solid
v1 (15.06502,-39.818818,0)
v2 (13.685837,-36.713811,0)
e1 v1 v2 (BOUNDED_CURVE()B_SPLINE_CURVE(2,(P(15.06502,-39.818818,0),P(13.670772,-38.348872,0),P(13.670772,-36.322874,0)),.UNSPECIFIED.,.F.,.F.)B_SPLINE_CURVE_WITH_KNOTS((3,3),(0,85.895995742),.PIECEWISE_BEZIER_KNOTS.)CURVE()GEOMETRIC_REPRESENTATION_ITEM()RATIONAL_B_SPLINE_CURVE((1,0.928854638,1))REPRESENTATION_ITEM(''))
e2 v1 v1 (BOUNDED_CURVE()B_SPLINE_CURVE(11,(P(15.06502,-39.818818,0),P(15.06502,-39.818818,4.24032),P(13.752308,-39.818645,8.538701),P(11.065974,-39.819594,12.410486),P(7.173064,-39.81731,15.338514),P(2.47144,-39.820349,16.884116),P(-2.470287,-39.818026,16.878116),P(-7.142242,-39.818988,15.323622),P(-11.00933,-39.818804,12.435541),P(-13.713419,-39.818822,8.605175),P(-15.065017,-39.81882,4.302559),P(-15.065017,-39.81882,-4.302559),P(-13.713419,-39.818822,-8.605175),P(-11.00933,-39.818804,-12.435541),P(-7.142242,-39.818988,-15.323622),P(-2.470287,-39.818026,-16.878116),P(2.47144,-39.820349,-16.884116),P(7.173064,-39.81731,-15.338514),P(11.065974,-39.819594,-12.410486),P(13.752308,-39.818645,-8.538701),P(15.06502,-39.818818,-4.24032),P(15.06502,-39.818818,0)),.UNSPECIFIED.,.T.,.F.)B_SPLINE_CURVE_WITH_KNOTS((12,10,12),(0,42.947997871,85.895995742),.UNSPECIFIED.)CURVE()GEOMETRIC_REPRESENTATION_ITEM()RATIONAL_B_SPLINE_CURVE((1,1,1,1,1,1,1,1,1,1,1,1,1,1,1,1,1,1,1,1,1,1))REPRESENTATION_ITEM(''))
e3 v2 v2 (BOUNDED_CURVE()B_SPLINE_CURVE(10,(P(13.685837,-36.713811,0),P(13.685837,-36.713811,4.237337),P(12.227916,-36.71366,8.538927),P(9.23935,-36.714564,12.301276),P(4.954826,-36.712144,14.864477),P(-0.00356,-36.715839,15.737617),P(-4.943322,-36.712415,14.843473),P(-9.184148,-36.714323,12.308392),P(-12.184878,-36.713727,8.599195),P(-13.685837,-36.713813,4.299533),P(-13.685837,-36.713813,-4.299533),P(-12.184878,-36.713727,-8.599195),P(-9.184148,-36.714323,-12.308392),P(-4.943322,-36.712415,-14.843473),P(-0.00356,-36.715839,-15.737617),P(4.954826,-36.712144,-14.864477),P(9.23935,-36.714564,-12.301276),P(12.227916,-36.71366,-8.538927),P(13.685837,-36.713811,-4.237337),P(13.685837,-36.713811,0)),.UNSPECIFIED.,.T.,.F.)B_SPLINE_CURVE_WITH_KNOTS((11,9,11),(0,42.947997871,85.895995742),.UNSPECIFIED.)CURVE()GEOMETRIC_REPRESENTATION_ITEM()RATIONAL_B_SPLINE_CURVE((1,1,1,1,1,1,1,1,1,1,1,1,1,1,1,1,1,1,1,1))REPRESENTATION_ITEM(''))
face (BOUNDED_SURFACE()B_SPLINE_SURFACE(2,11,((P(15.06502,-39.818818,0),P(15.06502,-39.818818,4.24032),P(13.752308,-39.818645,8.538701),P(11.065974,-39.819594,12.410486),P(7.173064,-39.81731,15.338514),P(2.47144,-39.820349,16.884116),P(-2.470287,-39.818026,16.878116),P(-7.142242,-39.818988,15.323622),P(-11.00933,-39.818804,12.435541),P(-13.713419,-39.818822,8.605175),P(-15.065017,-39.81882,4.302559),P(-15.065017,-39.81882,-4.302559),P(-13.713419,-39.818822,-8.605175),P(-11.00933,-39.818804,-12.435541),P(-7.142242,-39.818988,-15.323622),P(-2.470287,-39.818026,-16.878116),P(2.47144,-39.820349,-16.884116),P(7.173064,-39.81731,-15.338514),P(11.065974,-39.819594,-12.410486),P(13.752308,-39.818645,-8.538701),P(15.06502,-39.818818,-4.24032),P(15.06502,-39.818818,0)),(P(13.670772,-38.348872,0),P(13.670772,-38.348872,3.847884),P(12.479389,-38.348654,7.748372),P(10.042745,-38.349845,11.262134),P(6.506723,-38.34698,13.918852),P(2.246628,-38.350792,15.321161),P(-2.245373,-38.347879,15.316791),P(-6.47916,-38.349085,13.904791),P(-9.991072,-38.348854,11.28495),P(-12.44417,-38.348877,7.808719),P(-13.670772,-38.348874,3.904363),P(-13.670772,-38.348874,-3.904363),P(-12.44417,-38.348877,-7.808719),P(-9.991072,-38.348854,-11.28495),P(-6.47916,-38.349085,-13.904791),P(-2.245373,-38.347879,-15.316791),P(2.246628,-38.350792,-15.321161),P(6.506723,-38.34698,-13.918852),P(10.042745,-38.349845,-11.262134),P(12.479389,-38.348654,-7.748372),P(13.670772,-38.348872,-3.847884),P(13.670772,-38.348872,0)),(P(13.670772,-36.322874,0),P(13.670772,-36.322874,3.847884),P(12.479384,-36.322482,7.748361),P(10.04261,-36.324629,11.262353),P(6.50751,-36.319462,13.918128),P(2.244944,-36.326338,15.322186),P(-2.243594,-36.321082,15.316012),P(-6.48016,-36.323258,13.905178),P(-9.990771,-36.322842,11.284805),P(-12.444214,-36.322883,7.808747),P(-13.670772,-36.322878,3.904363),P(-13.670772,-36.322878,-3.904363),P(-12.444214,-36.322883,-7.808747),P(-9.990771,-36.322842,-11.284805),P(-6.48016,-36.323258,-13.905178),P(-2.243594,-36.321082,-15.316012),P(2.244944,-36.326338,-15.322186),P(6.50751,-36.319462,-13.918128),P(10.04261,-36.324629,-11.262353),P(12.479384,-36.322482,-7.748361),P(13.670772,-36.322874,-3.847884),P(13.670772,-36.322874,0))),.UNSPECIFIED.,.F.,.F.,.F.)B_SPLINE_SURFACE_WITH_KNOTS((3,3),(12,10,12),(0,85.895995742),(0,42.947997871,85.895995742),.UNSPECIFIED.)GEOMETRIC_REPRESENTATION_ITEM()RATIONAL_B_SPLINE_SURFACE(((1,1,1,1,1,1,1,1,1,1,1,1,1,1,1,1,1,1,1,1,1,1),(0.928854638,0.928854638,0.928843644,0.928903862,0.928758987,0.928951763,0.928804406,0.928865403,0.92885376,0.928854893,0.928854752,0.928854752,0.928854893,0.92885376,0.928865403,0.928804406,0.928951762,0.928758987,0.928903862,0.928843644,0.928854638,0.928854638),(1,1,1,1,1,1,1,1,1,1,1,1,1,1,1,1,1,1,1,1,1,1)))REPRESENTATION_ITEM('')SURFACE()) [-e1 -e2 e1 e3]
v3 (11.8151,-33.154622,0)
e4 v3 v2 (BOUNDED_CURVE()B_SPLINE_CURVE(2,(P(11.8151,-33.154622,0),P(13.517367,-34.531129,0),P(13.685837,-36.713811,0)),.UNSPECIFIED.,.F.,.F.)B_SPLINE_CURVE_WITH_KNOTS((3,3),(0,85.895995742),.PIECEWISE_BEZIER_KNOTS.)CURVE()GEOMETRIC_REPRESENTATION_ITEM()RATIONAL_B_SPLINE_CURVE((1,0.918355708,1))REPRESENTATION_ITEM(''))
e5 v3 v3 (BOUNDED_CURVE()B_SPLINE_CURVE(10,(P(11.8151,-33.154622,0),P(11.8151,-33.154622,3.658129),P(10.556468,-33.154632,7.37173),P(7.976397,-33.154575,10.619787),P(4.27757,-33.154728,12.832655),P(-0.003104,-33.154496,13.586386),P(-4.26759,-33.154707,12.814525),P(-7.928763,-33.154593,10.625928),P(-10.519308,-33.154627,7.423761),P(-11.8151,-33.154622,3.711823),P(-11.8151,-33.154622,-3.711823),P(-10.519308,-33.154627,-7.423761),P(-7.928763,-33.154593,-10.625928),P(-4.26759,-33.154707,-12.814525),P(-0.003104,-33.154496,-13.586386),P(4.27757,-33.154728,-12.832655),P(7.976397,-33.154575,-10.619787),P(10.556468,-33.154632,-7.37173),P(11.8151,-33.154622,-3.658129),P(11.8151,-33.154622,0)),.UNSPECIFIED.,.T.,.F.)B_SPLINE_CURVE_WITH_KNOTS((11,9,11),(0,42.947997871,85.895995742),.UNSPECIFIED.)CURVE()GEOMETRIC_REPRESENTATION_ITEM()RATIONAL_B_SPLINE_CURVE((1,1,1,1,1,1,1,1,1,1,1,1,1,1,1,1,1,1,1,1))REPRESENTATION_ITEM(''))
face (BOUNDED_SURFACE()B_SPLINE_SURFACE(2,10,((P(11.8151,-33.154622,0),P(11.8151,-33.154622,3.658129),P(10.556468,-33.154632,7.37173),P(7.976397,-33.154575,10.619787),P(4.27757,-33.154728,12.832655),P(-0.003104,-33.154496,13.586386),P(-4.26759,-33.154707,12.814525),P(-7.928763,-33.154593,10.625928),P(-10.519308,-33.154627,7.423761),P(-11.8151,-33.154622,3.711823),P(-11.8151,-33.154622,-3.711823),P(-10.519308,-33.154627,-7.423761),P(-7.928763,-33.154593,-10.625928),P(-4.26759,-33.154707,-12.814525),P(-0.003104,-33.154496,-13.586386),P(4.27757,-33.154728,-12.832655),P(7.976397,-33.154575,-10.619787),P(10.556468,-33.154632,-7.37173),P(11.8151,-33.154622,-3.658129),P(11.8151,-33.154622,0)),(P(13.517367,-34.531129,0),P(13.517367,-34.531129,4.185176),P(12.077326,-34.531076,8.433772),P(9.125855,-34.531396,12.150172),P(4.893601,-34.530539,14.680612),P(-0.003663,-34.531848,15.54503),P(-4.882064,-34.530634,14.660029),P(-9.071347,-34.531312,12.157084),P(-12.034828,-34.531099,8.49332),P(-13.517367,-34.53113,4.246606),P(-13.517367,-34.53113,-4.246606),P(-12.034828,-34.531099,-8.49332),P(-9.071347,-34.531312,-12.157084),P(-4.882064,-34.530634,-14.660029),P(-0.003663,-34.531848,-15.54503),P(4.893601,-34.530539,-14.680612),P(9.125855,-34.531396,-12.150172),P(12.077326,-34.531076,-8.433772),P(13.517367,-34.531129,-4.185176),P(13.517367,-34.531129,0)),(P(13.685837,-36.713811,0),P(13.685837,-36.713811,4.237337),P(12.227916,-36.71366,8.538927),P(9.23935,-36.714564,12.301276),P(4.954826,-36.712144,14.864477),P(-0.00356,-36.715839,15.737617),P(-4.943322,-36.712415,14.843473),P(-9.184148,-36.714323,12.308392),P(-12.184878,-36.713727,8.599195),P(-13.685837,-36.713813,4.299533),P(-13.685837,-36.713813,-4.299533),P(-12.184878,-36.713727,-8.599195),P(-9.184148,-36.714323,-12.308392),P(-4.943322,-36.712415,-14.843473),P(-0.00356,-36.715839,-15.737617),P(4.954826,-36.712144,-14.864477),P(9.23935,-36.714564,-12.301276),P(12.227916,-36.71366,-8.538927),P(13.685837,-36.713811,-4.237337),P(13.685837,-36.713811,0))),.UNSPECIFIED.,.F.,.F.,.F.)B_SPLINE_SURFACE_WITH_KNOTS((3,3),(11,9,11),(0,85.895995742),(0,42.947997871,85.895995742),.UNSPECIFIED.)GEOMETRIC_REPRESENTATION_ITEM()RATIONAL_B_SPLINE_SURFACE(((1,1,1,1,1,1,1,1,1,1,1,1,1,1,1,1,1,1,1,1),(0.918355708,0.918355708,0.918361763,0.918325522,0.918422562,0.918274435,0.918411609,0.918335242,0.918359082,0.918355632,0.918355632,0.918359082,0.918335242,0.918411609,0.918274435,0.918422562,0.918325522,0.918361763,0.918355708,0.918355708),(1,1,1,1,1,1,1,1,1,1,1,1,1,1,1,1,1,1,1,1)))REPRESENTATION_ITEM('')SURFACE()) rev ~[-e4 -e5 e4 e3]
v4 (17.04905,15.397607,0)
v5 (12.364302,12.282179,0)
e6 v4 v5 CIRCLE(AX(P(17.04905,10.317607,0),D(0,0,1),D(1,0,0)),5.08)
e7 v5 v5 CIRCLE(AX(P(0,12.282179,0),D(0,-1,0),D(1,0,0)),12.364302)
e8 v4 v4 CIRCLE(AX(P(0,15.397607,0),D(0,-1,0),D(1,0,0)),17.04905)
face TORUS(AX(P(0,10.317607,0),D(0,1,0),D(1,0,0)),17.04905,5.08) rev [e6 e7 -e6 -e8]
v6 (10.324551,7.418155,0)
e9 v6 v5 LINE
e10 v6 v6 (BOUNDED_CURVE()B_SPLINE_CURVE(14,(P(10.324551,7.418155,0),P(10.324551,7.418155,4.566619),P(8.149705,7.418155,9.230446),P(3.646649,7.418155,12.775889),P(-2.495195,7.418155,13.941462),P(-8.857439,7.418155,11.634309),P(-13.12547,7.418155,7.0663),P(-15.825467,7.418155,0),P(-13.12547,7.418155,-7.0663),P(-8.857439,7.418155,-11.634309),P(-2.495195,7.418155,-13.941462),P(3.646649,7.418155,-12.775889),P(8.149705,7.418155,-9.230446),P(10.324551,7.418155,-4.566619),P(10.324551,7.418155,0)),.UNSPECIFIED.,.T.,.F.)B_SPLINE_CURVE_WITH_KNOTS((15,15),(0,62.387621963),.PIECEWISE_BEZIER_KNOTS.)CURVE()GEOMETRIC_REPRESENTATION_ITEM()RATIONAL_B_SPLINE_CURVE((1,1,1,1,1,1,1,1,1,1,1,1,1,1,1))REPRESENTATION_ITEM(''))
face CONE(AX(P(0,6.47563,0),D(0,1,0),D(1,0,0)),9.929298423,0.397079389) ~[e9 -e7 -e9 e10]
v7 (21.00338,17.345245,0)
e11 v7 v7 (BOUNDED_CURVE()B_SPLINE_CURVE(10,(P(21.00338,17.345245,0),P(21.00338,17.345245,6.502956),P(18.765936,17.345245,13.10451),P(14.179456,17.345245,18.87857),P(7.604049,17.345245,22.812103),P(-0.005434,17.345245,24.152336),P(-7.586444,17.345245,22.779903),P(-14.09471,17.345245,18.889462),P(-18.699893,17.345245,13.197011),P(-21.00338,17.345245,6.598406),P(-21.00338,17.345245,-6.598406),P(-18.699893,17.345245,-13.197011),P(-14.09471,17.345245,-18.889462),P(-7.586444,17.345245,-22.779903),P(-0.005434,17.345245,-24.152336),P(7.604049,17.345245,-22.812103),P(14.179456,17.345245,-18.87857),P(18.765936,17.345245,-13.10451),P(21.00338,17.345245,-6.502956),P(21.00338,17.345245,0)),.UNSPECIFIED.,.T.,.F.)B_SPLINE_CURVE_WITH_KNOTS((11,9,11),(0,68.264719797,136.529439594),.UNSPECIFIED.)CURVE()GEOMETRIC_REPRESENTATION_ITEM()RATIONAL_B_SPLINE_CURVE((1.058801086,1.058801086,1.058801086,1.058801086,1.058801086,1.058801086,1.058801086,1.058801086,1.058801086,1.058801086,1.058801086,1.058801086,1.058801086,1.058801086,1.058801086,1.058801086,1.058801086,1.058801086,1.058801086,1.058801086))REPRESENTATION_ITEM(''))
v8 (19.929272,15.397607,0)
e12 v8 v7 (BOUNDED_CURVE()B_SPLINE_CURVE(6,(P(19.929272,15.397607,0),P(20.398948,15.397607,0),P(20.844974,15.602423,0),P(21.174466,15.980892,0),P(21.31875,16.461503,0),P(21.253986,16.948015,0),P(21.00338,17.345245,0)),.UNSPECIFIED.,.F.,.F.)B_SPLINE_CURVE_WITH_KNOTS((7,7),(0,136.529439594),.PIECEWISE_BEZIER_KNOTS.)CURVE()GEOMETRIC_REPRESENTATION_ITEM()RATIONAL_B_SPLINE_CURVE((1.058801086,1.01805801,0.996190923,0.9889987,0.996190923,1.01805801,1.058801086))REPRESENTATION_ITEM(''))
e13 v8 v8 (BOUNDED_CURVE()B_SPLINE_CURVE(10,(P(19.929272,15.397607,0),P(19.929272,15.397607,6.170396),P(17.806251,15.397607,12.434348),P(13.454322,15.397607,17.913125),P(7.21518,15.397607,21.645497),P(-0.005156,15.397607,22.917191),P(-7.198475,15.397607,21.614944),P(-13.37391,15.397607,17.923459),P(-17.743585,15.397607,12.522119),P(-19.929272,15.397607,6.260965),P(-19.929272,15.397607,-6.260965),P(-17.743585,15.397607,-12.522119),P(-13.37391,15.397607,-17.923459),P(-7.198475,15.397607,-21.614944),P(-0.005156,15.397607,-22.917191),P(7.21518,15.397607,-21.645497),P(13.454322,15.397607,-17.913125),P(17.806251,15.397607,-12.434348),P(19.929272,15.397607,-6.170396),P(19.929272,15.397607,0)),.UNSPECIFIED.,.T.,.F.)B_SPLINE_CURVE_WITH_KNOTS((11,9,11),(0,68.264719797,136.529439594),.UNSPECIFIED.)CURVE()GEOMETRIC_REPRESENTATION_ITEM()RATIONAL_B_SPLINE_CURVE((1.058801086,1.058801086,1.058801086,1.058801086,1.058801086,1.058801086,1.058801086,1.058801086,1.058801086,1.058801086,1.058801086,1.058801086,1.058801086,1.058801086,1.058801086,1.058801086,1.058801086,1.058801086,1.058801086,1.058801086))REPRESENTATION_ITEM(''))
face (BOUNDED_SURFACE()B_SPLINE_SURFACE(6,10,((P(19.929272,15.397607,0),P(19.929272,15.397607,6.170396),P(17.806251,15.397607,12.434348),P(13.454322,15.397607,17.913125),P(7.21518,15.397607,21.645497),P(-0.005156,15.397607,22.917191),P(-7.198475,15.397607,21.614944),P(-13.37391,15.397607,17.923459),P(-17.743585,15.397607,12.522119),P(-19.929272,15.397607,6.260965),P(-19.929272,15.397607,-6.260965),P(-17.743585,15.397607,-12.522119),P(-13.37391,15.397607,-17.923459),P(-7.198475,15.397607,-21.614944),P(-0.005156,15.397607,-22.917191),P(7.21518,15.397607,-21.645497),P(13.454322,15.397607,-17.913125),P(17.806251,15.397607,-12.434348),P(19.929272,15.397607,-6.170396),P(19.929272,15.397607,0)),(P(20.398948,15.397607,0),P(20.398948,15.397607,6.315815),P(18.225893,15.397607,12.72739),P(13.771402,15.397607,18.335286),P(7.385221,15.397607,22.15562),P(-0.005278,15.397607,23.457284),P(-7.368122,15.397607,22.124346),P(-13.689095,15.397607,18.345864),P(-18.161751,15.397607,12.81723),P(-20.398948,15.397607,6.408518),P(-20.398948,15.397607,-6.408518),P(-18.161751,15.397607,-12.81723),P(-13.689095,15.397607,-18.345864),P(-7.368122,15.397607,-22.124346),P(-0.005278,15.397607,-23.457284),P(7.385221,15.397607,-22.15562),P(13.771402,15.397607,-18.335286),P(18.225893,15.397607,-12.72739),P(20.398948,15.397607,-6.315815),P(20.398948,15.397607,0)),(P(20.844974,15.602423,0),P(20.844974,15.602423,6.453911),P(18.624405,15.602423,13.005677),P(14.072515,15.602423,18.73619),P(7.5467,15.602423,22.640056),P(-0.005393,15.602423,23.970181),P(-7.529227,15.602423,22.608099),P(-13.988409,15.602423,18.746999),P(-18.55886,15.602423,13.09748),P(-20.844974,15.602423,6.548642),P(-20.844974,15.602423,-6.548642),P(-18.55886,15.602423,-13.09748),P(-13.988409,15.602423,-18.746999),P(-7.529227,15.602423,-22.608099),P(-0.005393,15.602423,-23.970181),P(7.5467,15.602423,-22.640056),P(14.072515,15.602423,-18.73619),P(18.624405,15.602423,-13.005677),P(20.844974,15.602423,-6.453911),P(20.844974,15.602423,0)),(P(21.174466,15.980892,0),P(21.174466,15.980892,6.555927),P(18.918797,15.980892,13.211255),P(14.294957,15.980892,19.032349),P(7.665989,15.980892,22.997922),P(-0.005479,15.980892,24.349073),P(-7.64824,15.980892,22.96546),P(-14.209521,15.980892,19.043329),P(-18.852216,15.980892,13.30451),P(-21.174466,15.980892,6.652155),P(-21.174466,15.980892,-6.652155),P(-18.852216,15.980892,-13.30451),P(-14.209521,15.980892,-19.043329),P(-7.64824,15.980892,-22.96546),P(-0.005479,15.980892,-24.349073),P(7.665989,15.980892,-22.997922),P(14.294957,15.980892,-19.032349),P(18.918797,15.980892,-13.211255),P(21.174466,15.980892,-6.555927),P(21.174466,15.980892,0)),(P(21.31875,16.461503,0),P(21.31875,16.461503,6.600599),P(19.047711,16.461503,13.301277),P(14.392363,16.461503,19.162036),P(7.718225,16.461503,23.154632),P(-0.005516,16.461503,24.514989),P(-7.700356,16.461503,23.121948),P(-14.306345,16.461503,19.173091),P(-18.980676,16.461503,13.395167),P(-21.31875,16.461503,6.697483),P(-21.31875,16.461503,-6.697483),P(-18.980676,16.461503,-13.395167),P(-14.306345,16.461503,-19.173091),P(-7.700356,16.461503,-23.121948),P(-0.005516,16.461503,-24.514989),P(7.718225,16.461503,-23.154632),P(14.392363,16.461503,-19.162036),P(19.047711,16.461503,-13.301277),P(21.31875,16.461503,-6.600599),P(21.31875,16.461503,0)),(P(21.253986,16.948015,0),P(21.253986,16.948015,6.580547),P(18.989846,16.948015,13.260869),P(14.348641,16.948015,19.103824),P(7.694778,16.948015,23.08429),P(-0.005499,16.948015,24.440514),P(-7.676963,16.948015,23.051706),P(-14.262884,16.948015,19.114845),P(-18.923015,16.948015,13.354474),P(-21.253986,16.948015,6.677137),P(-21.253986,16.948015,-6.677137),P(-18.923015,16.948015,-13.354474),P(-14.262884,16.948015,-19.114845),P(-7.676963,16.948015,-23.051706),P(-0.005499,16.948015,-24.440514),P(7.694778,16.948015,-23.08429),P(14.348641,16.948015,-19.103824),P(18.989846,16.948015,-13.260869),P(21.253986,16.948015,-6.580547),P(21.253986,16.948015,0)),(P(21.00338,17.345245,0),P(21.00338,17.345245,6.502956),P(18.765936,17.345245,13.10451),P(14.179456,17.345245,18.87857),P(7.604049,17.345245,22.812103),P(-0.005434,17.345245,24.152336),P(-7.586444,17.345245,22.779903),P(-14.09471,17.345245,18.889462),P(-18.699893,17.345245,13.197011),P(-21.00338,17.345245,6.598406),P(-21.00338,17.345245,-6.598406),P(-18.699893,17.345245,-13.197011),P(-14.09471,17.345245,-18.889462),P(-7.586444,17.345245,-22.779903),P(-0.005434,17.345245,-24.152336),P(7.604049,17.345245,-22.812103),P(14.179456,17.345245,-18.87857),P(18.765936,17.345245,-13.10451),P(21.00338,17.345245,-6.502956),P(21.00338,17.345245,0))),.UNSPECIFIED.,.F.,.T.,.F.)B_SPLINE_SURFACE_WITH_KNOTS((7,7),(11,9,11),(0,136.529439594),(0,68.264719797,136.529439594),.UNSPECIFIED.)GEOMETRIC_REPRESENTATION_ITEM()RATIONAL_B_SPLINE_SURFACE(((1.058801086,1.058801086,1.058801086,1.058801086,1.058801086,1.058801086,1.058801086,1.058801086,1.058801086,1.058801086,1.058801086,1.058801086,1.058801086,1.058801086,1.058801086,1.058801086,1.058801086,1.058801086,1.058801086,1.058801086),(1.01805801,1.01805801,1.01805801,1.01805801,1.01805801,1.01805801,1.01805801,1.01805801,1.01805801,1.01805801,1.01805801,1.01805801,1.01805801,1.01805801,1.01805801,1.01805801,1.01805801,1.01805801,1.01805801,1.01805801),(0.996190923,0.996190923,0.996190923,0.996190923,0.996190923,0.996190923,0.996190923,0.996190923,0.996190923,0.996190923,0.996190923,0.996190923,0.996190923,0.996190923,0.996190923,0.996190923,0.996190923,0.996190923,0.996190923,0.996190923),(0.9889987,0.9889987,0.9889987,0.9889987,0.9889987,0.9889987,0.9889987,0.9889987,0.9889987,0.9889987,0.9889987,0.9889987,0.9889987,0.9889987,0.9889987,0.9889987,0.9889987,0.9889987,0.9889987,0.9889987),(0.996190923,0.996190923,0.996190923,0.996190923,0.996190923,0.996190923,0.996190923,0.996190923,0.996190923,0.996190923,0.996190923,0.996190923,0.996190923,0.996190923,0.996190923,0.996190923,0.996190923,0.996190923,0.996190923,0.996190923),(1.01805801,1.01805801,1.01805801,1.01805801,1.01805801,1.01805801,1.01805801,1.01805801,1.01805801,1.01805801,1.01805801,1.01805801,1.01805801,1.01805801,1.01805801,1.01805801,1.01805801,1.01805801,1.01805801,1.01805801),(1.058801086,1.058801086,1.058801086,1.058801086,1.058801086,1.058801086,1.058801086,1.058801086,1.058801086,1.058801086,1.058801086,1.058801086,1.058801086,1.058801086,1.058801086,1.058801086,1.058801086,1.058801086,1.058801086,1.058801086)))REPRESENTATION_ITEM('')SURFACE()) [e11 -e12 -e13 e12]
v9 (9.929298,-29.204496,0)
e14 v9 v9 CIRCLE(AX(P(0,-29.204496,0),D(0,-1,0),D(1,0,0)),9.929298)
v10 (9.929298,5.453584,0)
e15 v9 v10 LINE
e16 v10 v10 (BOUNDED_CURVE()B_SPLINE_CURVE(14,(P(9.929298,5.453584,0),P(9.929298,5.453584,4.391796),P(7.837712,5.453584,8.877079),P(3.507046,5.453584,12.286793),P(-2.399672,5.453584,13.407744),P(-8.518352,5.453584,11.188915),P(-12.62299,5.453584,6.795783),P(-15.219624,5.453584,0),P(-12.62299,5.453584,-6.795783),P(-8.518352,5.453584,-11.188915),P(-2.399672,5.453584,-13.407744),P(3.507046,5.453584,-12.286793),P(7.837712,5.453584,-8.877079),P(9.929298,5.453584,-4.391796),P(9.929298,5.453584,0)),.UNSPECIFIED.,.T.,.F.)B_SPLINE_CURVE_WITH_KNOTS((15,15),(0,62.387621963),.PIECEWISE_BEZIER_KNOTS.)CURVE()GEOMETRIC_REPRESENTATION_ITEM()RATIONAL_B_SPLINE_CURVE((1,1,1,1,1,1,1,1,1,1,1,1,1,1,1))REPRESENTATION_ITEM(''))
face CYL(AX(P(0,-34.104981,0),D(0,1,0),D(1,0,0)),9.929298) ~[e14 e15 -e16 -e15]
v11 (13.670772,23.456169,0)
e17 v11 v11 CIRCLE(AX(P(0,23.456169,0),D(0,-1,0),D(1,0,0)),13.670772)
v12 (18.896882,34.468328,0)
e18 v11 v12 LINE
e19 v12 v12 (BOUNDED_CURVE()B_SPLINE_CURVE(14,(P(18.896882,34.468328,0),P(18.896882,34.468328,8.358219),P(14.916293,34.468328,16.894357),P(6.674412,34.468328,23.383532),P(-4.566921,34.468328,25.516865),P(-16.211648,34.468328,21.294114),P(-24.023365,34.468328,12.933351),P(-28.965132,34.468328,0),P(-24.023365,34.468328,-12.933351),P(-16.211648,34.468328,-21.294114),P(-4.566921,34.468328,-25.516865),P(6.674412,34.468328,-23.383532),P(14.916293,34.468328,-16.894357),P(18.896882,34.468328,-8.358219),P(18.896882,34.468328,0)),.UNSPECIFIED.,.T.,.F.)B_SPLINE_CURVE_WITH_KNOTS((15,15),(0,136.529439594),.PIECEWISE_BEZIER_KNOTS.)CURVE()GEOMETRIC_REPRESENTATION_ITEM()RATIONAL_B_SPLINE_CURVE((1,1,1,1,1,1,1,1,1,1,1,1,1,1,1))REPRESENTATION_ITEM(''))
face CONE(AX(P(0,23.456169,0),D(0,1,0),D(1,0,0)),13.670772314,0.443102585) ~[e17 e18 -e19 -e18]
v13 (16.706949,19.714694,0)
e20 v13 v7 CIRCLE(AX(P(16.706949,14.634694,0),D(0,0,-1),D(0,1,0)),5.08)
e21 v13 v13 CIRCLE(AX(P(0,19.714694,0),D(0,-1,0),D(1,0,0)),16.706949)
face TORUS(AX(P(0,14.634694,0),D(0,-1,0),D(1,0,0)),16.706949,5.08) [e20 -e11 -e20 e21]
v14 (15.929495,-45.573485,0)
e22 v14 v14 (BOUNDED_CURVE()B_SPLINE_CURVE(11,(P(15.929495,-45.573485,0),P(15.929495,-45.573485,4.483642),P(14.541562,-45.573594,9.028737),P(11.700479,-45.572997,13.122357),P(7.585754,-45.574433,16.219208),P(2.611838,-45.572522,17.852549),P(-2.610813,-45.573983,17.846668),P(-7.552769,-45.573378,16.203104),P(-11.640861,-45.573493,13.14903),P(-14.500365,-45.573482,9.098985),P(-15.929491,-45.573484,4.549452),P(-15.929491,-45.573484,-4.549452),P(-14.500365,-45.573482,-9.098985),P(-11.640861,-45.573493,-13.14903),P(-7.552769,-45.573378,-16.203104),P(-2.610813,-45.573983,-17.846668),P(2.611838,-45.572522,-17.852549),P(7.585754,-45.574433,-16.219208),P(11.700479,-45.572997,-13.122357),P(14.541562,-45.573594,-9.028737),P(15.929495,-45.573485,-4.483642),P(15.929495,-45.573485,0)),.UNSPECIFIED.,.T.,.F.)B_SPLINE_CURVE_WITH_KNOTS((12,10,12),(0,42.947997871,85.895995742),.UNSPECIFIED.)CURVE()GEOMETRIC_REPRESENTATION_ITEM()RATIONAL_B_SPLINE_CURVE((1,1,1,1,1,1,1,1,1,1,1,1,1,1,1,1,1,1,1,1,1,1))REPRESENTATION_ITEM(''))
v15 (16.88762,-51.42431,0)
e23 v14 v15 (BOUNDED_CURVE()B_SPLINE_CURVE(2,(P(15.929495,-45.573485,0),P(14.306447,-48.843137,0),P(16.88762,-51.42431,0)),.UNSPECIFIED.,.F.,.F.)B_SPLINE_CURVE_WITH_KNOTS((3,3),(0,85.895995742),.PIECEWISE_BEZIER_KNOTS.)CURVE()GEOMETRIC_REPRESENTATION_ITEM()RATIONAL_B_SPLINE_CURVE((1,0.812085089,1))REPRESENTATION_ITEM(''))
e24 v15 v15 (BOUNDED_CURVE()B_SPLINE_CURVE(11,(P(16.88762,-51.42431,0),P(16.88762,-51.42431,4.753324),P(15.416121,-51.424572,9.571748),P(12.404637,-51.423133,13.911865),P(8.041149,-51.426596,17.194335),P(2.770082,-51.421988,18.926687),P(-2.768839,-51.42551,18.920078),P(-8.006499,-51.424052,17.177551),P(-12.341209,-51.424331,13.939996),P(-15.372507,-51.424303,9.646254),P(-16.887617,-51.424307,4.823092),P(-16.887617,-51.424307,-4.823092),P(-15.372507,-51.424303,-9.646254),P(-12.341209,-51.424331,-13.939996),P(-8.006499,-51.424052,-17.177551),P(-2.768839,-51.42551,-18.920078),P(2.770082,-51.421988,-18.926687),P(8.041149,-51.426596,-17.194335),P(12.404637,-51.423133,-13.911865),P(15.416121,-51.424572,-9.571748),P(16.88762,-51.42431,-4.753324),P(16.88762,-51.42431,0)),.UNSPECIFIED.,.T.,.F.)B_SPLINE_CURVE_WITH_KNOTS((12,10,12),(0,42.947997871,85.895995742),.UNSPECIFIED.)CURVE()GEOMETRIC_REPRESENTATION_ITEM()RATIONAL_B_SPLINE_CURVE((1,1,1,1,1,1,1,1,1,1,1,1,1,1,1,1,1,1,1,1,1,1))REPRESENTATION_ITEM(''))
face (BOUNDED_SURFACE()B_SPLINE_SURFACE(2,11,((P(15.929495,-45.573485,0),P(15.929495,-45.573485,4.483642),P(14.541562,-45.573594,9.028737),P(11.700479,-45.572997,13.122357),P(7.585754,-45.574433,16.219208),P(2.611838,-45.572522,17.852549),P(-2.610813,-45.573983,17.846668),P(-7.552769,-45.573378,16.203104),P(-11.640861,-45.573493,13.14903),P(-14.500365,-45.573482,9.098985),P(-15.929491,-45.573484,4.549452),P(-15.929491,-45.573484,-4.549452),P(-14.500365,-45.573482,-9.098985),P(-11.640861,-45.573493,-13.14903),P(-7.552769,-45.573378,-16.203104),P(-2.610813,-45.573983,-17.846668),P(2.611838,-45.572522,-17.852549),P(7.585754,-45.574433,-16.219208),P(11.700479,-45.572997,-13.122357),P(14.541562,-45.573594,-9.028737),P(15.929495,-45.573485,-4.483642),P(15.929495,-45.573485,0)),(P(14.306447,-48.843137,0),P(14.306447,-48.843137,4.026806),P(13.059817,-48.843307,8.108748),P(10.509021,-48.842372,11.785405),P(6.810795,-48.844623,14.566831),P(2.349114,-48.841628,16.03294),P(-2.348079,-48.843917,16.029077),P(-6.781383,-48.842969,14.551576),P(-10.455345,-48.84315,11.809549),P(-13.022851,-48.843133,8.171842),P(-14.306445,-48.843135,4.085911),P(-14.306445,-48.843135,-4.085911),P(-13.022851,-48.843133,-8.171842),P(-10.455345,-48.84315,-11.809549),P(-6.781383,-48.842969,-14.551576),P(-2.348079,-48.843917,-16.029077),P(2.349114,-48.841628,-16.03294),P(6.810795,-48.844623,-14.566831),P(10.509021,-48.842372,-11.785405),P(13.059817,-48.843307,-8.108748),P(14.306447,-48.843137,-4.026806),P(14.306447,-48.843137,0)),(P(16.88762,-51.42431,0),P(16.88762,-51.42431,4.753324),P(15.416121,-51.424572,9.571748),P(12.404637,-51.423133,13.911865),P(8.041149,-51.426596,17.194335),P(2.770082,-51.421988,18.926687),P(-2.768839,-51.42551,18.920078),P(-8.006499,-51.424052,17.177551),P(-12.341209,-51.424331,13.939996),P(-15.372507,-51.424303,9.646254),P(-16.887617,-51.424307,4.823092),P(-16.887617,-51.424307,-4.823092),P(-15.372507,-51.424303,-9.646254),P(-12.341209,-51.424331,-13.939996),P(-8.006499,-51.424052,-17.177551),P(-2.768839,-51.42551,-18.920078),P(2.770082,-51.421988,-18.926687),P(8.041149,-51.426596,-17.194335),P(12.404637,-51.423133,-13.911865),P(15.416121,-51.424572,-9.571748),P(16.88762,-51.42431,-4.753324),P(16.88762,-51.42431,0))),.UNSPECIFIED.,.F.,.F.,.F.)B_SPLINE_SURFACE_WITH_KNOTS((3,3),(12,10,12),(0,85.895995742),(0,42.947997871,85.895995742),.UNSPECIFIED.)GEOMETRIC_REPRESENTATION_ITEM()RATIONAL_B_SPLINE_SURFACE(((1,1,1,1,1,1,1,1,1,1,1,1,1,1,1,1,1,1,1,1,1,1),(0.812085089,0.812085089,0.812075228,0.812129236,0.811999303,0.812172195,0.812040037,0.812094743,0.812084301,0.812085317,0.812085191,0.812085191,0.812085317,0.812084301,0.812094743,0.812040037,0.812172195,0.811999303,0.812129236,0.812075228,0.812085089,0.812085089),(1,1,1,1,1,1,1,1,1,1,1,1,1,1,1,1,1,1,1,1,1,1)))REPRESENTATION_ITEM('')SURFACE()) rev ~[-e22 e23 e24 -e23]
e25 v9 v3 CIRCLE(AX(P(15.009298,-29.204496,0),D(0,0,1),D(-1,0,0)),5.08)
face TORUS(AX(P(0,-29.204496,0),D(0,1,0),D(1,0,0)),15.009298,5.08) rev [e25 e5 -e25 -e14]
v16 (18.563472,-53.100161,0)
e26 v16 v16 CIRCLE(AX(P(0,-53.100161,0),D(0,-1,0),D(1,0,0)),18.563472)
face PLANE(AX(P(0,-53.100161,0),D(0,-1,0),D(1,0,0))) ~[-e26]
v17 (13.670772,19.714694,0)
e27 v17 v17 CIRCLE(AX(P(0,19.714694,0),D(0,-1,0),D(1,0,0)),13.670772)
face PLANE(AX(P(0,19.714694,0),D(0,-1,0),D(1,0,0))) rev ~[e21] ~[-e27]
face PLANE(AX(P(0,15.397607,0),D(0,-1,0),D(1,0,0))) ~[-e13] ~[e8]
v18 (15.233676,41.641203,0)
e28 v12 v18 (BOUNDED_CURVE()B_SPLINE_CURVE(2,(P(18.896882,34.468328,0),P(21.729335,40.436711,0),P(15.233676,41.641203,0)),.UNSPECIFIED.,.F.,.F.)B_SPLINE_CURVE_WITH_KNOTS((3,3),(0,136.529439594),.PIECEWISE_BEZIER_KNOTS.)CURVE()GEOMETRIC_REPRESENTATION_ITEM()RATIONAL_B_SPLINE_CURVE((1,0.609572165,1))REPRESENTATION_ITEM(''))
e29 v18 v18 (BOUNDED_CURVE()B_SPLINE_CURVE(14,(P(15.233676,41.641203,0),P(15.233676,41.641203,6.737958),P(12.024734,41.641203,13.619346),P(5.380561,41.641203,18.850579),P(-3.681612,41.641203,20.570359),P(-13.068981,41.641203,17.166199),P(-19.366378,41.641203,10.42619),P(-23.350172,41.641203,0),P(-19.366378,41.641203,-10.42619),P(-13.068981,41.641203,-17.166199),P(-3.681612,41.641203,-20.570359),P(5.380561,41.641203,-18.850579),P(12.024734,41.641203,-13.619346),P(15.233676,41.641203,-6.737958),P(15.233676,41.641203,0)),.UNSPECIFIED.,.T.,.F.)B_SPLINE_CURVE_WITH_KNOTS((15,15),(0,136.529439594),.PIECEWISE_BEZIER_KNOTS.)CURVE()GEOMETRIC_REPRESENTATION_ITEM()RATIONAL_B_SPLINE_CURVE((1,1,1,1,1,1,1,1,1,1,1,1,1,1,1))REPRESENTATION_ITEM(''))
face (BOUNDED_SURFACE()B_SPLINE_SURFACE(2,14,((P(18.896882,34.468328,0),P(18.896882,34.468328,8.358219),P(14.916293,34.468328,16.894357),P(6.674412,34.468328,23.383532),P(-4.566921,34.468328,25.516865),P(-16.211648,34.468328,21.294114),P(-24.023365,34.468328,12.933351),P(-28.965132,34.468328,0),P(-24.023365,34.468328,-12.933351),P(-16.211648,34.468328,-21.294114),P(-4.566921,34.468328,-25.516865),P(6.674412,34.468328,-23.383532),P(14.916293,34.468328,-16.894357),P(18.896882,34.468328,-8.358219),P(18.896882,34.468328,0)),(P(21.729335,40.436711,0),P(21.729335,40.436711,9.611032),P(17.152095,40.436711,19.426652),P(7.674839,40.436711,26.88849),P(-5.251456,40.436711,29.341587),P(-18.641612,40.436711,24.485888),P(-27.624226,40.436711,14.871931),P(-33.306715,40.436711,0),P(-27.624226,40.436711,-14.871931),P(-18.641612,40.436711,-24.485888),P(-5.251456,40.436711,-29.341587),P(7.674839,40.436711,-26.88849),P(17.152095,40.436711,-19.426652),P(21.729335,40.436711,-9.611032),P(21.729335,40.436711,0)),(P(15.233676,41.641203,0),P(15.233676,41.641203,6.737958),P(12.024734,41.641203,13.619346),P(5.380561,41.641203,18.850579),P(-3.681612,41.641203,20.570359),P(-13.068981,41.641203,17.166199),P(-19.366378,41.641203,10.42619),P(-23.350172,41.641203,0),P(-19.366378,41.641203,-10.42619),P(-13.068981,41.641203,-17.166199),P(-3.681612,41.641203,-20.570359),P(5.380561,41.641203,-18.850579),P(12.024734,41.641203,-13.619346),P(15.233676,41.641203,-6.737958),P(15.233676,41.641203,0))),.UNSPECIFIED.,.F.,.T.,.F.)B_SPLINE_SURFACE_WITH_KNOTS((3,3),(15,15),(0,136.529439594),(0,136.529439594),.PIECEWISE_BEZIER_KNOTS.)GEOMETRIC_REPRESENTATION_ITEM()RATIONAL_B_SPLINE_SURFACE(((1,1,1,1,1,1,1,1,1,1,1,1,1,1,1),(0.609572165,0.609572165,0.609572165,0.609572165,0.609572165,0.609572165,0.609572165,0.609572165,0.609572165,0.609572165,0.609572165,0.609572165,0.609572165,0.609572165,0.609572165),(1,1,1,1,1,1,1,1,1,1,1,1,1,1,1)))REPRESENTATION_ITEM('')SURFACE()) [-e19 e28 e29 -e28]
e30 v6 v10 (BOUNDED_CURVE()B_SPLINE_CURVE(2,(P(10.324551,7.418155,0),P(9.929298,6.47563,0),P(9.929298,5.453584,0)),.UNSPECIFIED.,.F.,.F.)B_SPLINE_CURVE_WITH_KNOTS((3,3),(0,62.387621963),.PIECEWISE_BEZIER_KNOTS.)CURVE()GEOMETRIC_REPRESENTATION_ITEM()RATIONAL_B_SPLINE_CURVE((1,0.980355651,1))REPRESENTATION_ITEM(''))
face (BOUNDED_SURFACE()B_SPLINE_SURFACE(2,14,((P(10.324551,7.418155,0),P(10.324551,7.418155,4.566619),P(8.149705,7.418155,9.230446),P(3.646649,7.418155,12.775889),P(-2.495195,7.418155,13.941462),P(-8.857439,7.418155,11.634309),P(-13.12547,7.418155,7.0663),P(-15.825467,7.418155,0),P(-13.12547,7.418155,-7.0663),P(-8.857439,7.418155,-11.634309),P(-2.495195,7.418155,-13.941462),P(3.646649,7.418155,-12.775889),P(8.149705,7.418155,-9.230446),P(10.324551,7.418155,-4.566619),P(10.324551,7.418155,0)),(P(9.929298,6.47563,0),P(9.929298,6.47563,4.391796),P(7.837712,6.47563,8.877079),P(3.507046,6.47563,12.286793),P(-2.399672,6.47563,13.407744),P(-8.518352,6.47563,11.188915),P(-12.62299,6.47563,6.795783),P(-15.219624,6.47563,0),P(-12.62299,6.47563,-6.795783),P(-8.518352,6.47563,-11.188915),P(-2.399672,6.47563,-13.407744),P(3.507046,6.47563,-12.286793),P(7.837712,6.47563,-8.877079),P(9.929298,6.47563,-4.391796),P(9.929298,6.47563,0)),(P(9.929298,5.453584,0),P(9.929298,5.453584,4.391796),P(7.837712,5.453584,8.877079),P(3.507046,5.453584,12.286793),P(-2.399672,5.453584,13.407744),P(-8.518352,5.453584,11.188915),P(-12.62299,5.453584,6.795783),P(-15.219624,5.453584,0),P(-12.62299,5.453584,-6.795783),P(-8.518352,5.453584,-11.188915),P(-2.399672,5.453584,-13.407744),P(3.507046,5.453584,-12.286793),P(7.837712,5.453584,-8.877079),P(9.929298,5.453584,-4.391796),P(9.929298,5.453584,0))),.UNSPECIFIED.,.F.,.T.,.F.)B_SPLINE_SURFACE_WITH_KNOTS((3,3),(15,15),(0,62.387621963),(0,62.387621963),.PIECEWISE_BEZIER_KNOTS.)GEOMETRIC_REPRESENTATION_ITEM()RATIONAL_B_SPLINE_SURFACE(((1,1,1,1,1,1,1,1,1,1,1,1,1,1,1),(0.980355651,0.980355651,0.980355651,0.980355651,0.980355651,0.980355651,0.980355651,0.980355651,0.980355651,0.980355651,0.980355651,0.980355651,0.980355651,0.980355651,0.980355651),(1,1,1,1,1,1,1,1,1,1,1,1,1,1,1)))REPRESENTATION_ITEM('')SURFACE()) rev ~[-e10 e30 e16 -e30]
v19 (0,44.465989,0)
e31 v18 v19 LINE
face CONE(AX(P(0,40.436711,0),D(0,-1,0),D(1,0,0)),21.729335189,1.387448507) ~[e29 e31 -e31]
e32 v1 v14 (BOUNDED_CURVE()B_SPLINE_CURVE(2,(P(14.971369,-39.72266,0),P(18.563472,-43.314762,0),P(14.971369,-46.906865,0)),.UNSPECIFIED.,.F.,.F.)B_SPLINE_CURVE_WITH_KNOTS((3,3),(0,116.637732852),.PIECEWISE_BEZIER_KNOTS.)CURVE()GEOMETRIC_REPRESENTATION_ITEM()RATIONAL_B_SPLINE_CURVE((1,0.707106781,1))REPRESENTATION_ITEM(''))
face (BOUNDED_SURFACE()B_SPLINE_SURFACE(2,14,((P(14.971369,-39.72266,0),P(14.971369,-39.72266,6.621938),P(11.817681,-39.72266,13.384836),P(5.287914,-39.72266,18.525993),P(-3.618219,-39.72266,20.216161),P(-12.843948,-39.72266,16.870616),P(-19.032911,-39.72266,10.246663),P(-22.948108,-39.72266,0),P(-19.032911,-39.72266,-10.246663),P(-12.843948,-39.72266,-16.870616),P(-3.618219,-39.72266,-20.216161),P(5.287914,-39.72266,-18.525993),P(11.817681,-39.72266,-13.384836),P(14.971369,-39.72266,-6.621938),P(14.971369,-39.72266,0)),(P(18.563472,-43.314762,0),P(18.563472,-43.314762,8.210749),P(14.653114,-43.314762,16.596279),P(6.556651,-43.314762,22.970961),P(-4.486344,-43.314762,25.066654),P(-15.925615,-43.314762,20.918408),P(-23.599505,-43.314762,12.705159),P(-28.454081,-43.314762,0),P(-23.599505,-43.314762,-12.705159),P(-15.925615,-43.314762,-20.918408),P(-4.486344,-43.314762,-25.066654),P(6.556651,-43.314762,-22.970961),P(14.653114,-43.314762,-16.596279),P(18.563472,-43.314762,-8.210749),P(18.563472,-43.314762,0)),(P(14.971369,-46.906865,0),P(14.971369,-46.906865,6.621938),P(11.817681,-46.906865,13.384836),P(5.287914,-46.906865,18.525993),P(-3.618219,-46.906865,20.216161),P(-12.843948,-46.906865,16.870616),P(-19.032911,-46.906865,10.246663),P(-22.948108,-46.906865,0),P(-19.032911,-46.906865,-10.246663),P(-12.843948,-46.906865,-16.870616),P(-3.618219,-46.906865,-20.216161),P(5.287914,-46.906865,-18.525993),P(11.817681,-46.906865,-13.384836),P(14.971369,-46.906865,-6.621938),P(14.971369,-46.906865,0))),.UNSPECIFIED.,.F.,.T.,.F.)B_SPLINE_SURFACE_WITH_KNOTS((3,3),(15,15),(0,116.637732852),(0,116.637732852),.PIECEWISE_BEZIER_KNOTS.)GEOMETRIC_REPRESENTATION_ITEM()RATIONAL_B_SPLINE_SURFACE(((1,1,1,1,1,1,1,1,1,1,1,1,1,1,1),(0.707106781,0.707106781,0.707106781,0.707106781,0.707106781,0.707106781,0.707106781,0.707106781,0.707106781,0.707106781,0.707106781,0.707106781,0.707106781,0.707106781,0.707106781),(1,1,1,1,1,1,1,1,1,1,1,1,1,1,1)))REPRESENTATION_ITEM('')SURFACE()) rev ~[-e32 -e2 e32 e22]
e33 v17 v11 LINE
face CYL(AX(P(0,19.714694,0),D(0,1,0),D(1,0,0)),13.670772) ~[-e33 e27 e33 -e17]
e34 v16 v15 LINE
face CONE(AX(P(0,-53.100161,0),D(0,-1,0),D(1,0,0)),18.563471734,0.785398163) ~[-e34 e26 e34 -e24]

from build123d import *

# Parameters (mm, degrees)
F2_R  = 5.08
F4_R  = 5.08
F6_R  = 5.08
F7_R  = 5.08
F8_R  = 5.08
F9_R  = 1.27
F10_R = 5.08


# Not quite as in the source:
# - a fillet or chamfer that OpenCascade refuses, or shapes differently, is made with other operations: its cross-section is extruded or revolved along the edge and cut away or added


with BuildPart() as f1:
    # F0 (on Top) → F1 (revolve)
    with BuildSketch(Plane.XY):
        Polygon((0, 44.4659888744), (0, -53.1001612544), (18.5634717345, -53.1001612544), (13.6707723141, -48.207461834), (18.5634717345, -43.3147624135), (13.6707723141, -38.422062993), (13.6707723141, -34.1049805284), (9.9292984232, -34.1049805284), (9.9292984232, 6.4756297506), (13.6707723141, 15.3976073489), (21.7293351889, 15.3976073489), (21.7293351889, 19.7146944702), (13.6707723141, 19.7146944702), (13.6707723141, 23.4561692923), (21.7293351889, 40.4367111623), align=None)
    revolve(axis=Axis((0, -4.31708619, 0), (0, -1, 0)))

    # F2
    f2_edges = [f1.edges().sort_by_distance(p)[0] for p in [
        (-21.729335, 40.436711, 0),
    ]]
    fillet(f2_edges, radius=F2_R)

    # F3: fillet of radius 5.08 on 1 edges, made by hand

    # F3_s1 → F3_t2 (revolve, cut)
    with BuildSketch(Plane.XY):
        with BuildLine():
            ThreePointArc((16.7069489095, 19.7146944702), (20.0183536398, 18.4870961512), (21.7293351889, 15.3976073489))
            Line((21.7293351889, 15.3976073489), (21.7293351889, 19.7146944702))
            Line((21.7293351889, 19.7146944702), (16.7069489095, 19.7146944702))
        make_face()
    revolve(axis=Axis((0, 19.7146944702, 0), (0, -1, 0)), mode=Mode.SUBTRACT)

    # F4
    f4_edges = [f1.edges().sort_by_distance(p)[0] for p in [
        (-9.929298, 6.47563, 0),
        (-13.670772, 15.397607, 0),
        (11.800035, 10.936619, 0),
    ]]
    fillet(f4_edges, radius=F4_R)

    # F5: fillet of radius 5.08 on 3 edges, made by hand

    # F5_s1 → F5_t2 (revolve)
    with BuildSketch(Plane.XY):
        with BuildLine():
            ThreePointArc((9.9292984232, -29.2044960773), (10.9715940857, -32.287245448), (13.6707723141, -34.1049805284))
            Line((13.6707723141, -34.1049805284), (9.9292984232, -34.1049805284))
            Line((9.9292984232, -34.1049805284), (9.9292984232, -29.2044960773))
        make_face()
    revolve(axis=Axis((0, -34.1049805284, 0), (0, -1, 0)))

    # F6
    f6_edges = [f1.edges().sort_by_distance(p)[0] for p in [
        (-18.563472, -43.314762, 0),
    ]]
    fillet(f6_edges, radius=F6_R)

    # F7
    f7_edges = [f1.edges().sort_by_distance(p)[0] for p in [
        (-13.670772, -38.422063, 0),
    ]]
    fillet(f7_edges, radius=F7_R)

    # F8
    f8_edges = [f1.edges().sort_by_distance(p)[0] for p in [
        (-13.670772, -48.207462, 0),
    ]]
    fillet(f8_edges, radius=F8_R)

    # F9
    f9_edges = [f1.edges().sort_by_distance(p)[0] for p in [
        (-21.729335, 15.397607, 0),
    ]]
    fillet(f9_edges, radius=F9_R)

    # F10
    f10_edges = [f1.edges().sort_by_distance(p)[0] for p in [
        (-13.670772, -34.104981, 0),
    ]]
    fillet(f10_edges, radius=F10_R)


solid = f1.part
